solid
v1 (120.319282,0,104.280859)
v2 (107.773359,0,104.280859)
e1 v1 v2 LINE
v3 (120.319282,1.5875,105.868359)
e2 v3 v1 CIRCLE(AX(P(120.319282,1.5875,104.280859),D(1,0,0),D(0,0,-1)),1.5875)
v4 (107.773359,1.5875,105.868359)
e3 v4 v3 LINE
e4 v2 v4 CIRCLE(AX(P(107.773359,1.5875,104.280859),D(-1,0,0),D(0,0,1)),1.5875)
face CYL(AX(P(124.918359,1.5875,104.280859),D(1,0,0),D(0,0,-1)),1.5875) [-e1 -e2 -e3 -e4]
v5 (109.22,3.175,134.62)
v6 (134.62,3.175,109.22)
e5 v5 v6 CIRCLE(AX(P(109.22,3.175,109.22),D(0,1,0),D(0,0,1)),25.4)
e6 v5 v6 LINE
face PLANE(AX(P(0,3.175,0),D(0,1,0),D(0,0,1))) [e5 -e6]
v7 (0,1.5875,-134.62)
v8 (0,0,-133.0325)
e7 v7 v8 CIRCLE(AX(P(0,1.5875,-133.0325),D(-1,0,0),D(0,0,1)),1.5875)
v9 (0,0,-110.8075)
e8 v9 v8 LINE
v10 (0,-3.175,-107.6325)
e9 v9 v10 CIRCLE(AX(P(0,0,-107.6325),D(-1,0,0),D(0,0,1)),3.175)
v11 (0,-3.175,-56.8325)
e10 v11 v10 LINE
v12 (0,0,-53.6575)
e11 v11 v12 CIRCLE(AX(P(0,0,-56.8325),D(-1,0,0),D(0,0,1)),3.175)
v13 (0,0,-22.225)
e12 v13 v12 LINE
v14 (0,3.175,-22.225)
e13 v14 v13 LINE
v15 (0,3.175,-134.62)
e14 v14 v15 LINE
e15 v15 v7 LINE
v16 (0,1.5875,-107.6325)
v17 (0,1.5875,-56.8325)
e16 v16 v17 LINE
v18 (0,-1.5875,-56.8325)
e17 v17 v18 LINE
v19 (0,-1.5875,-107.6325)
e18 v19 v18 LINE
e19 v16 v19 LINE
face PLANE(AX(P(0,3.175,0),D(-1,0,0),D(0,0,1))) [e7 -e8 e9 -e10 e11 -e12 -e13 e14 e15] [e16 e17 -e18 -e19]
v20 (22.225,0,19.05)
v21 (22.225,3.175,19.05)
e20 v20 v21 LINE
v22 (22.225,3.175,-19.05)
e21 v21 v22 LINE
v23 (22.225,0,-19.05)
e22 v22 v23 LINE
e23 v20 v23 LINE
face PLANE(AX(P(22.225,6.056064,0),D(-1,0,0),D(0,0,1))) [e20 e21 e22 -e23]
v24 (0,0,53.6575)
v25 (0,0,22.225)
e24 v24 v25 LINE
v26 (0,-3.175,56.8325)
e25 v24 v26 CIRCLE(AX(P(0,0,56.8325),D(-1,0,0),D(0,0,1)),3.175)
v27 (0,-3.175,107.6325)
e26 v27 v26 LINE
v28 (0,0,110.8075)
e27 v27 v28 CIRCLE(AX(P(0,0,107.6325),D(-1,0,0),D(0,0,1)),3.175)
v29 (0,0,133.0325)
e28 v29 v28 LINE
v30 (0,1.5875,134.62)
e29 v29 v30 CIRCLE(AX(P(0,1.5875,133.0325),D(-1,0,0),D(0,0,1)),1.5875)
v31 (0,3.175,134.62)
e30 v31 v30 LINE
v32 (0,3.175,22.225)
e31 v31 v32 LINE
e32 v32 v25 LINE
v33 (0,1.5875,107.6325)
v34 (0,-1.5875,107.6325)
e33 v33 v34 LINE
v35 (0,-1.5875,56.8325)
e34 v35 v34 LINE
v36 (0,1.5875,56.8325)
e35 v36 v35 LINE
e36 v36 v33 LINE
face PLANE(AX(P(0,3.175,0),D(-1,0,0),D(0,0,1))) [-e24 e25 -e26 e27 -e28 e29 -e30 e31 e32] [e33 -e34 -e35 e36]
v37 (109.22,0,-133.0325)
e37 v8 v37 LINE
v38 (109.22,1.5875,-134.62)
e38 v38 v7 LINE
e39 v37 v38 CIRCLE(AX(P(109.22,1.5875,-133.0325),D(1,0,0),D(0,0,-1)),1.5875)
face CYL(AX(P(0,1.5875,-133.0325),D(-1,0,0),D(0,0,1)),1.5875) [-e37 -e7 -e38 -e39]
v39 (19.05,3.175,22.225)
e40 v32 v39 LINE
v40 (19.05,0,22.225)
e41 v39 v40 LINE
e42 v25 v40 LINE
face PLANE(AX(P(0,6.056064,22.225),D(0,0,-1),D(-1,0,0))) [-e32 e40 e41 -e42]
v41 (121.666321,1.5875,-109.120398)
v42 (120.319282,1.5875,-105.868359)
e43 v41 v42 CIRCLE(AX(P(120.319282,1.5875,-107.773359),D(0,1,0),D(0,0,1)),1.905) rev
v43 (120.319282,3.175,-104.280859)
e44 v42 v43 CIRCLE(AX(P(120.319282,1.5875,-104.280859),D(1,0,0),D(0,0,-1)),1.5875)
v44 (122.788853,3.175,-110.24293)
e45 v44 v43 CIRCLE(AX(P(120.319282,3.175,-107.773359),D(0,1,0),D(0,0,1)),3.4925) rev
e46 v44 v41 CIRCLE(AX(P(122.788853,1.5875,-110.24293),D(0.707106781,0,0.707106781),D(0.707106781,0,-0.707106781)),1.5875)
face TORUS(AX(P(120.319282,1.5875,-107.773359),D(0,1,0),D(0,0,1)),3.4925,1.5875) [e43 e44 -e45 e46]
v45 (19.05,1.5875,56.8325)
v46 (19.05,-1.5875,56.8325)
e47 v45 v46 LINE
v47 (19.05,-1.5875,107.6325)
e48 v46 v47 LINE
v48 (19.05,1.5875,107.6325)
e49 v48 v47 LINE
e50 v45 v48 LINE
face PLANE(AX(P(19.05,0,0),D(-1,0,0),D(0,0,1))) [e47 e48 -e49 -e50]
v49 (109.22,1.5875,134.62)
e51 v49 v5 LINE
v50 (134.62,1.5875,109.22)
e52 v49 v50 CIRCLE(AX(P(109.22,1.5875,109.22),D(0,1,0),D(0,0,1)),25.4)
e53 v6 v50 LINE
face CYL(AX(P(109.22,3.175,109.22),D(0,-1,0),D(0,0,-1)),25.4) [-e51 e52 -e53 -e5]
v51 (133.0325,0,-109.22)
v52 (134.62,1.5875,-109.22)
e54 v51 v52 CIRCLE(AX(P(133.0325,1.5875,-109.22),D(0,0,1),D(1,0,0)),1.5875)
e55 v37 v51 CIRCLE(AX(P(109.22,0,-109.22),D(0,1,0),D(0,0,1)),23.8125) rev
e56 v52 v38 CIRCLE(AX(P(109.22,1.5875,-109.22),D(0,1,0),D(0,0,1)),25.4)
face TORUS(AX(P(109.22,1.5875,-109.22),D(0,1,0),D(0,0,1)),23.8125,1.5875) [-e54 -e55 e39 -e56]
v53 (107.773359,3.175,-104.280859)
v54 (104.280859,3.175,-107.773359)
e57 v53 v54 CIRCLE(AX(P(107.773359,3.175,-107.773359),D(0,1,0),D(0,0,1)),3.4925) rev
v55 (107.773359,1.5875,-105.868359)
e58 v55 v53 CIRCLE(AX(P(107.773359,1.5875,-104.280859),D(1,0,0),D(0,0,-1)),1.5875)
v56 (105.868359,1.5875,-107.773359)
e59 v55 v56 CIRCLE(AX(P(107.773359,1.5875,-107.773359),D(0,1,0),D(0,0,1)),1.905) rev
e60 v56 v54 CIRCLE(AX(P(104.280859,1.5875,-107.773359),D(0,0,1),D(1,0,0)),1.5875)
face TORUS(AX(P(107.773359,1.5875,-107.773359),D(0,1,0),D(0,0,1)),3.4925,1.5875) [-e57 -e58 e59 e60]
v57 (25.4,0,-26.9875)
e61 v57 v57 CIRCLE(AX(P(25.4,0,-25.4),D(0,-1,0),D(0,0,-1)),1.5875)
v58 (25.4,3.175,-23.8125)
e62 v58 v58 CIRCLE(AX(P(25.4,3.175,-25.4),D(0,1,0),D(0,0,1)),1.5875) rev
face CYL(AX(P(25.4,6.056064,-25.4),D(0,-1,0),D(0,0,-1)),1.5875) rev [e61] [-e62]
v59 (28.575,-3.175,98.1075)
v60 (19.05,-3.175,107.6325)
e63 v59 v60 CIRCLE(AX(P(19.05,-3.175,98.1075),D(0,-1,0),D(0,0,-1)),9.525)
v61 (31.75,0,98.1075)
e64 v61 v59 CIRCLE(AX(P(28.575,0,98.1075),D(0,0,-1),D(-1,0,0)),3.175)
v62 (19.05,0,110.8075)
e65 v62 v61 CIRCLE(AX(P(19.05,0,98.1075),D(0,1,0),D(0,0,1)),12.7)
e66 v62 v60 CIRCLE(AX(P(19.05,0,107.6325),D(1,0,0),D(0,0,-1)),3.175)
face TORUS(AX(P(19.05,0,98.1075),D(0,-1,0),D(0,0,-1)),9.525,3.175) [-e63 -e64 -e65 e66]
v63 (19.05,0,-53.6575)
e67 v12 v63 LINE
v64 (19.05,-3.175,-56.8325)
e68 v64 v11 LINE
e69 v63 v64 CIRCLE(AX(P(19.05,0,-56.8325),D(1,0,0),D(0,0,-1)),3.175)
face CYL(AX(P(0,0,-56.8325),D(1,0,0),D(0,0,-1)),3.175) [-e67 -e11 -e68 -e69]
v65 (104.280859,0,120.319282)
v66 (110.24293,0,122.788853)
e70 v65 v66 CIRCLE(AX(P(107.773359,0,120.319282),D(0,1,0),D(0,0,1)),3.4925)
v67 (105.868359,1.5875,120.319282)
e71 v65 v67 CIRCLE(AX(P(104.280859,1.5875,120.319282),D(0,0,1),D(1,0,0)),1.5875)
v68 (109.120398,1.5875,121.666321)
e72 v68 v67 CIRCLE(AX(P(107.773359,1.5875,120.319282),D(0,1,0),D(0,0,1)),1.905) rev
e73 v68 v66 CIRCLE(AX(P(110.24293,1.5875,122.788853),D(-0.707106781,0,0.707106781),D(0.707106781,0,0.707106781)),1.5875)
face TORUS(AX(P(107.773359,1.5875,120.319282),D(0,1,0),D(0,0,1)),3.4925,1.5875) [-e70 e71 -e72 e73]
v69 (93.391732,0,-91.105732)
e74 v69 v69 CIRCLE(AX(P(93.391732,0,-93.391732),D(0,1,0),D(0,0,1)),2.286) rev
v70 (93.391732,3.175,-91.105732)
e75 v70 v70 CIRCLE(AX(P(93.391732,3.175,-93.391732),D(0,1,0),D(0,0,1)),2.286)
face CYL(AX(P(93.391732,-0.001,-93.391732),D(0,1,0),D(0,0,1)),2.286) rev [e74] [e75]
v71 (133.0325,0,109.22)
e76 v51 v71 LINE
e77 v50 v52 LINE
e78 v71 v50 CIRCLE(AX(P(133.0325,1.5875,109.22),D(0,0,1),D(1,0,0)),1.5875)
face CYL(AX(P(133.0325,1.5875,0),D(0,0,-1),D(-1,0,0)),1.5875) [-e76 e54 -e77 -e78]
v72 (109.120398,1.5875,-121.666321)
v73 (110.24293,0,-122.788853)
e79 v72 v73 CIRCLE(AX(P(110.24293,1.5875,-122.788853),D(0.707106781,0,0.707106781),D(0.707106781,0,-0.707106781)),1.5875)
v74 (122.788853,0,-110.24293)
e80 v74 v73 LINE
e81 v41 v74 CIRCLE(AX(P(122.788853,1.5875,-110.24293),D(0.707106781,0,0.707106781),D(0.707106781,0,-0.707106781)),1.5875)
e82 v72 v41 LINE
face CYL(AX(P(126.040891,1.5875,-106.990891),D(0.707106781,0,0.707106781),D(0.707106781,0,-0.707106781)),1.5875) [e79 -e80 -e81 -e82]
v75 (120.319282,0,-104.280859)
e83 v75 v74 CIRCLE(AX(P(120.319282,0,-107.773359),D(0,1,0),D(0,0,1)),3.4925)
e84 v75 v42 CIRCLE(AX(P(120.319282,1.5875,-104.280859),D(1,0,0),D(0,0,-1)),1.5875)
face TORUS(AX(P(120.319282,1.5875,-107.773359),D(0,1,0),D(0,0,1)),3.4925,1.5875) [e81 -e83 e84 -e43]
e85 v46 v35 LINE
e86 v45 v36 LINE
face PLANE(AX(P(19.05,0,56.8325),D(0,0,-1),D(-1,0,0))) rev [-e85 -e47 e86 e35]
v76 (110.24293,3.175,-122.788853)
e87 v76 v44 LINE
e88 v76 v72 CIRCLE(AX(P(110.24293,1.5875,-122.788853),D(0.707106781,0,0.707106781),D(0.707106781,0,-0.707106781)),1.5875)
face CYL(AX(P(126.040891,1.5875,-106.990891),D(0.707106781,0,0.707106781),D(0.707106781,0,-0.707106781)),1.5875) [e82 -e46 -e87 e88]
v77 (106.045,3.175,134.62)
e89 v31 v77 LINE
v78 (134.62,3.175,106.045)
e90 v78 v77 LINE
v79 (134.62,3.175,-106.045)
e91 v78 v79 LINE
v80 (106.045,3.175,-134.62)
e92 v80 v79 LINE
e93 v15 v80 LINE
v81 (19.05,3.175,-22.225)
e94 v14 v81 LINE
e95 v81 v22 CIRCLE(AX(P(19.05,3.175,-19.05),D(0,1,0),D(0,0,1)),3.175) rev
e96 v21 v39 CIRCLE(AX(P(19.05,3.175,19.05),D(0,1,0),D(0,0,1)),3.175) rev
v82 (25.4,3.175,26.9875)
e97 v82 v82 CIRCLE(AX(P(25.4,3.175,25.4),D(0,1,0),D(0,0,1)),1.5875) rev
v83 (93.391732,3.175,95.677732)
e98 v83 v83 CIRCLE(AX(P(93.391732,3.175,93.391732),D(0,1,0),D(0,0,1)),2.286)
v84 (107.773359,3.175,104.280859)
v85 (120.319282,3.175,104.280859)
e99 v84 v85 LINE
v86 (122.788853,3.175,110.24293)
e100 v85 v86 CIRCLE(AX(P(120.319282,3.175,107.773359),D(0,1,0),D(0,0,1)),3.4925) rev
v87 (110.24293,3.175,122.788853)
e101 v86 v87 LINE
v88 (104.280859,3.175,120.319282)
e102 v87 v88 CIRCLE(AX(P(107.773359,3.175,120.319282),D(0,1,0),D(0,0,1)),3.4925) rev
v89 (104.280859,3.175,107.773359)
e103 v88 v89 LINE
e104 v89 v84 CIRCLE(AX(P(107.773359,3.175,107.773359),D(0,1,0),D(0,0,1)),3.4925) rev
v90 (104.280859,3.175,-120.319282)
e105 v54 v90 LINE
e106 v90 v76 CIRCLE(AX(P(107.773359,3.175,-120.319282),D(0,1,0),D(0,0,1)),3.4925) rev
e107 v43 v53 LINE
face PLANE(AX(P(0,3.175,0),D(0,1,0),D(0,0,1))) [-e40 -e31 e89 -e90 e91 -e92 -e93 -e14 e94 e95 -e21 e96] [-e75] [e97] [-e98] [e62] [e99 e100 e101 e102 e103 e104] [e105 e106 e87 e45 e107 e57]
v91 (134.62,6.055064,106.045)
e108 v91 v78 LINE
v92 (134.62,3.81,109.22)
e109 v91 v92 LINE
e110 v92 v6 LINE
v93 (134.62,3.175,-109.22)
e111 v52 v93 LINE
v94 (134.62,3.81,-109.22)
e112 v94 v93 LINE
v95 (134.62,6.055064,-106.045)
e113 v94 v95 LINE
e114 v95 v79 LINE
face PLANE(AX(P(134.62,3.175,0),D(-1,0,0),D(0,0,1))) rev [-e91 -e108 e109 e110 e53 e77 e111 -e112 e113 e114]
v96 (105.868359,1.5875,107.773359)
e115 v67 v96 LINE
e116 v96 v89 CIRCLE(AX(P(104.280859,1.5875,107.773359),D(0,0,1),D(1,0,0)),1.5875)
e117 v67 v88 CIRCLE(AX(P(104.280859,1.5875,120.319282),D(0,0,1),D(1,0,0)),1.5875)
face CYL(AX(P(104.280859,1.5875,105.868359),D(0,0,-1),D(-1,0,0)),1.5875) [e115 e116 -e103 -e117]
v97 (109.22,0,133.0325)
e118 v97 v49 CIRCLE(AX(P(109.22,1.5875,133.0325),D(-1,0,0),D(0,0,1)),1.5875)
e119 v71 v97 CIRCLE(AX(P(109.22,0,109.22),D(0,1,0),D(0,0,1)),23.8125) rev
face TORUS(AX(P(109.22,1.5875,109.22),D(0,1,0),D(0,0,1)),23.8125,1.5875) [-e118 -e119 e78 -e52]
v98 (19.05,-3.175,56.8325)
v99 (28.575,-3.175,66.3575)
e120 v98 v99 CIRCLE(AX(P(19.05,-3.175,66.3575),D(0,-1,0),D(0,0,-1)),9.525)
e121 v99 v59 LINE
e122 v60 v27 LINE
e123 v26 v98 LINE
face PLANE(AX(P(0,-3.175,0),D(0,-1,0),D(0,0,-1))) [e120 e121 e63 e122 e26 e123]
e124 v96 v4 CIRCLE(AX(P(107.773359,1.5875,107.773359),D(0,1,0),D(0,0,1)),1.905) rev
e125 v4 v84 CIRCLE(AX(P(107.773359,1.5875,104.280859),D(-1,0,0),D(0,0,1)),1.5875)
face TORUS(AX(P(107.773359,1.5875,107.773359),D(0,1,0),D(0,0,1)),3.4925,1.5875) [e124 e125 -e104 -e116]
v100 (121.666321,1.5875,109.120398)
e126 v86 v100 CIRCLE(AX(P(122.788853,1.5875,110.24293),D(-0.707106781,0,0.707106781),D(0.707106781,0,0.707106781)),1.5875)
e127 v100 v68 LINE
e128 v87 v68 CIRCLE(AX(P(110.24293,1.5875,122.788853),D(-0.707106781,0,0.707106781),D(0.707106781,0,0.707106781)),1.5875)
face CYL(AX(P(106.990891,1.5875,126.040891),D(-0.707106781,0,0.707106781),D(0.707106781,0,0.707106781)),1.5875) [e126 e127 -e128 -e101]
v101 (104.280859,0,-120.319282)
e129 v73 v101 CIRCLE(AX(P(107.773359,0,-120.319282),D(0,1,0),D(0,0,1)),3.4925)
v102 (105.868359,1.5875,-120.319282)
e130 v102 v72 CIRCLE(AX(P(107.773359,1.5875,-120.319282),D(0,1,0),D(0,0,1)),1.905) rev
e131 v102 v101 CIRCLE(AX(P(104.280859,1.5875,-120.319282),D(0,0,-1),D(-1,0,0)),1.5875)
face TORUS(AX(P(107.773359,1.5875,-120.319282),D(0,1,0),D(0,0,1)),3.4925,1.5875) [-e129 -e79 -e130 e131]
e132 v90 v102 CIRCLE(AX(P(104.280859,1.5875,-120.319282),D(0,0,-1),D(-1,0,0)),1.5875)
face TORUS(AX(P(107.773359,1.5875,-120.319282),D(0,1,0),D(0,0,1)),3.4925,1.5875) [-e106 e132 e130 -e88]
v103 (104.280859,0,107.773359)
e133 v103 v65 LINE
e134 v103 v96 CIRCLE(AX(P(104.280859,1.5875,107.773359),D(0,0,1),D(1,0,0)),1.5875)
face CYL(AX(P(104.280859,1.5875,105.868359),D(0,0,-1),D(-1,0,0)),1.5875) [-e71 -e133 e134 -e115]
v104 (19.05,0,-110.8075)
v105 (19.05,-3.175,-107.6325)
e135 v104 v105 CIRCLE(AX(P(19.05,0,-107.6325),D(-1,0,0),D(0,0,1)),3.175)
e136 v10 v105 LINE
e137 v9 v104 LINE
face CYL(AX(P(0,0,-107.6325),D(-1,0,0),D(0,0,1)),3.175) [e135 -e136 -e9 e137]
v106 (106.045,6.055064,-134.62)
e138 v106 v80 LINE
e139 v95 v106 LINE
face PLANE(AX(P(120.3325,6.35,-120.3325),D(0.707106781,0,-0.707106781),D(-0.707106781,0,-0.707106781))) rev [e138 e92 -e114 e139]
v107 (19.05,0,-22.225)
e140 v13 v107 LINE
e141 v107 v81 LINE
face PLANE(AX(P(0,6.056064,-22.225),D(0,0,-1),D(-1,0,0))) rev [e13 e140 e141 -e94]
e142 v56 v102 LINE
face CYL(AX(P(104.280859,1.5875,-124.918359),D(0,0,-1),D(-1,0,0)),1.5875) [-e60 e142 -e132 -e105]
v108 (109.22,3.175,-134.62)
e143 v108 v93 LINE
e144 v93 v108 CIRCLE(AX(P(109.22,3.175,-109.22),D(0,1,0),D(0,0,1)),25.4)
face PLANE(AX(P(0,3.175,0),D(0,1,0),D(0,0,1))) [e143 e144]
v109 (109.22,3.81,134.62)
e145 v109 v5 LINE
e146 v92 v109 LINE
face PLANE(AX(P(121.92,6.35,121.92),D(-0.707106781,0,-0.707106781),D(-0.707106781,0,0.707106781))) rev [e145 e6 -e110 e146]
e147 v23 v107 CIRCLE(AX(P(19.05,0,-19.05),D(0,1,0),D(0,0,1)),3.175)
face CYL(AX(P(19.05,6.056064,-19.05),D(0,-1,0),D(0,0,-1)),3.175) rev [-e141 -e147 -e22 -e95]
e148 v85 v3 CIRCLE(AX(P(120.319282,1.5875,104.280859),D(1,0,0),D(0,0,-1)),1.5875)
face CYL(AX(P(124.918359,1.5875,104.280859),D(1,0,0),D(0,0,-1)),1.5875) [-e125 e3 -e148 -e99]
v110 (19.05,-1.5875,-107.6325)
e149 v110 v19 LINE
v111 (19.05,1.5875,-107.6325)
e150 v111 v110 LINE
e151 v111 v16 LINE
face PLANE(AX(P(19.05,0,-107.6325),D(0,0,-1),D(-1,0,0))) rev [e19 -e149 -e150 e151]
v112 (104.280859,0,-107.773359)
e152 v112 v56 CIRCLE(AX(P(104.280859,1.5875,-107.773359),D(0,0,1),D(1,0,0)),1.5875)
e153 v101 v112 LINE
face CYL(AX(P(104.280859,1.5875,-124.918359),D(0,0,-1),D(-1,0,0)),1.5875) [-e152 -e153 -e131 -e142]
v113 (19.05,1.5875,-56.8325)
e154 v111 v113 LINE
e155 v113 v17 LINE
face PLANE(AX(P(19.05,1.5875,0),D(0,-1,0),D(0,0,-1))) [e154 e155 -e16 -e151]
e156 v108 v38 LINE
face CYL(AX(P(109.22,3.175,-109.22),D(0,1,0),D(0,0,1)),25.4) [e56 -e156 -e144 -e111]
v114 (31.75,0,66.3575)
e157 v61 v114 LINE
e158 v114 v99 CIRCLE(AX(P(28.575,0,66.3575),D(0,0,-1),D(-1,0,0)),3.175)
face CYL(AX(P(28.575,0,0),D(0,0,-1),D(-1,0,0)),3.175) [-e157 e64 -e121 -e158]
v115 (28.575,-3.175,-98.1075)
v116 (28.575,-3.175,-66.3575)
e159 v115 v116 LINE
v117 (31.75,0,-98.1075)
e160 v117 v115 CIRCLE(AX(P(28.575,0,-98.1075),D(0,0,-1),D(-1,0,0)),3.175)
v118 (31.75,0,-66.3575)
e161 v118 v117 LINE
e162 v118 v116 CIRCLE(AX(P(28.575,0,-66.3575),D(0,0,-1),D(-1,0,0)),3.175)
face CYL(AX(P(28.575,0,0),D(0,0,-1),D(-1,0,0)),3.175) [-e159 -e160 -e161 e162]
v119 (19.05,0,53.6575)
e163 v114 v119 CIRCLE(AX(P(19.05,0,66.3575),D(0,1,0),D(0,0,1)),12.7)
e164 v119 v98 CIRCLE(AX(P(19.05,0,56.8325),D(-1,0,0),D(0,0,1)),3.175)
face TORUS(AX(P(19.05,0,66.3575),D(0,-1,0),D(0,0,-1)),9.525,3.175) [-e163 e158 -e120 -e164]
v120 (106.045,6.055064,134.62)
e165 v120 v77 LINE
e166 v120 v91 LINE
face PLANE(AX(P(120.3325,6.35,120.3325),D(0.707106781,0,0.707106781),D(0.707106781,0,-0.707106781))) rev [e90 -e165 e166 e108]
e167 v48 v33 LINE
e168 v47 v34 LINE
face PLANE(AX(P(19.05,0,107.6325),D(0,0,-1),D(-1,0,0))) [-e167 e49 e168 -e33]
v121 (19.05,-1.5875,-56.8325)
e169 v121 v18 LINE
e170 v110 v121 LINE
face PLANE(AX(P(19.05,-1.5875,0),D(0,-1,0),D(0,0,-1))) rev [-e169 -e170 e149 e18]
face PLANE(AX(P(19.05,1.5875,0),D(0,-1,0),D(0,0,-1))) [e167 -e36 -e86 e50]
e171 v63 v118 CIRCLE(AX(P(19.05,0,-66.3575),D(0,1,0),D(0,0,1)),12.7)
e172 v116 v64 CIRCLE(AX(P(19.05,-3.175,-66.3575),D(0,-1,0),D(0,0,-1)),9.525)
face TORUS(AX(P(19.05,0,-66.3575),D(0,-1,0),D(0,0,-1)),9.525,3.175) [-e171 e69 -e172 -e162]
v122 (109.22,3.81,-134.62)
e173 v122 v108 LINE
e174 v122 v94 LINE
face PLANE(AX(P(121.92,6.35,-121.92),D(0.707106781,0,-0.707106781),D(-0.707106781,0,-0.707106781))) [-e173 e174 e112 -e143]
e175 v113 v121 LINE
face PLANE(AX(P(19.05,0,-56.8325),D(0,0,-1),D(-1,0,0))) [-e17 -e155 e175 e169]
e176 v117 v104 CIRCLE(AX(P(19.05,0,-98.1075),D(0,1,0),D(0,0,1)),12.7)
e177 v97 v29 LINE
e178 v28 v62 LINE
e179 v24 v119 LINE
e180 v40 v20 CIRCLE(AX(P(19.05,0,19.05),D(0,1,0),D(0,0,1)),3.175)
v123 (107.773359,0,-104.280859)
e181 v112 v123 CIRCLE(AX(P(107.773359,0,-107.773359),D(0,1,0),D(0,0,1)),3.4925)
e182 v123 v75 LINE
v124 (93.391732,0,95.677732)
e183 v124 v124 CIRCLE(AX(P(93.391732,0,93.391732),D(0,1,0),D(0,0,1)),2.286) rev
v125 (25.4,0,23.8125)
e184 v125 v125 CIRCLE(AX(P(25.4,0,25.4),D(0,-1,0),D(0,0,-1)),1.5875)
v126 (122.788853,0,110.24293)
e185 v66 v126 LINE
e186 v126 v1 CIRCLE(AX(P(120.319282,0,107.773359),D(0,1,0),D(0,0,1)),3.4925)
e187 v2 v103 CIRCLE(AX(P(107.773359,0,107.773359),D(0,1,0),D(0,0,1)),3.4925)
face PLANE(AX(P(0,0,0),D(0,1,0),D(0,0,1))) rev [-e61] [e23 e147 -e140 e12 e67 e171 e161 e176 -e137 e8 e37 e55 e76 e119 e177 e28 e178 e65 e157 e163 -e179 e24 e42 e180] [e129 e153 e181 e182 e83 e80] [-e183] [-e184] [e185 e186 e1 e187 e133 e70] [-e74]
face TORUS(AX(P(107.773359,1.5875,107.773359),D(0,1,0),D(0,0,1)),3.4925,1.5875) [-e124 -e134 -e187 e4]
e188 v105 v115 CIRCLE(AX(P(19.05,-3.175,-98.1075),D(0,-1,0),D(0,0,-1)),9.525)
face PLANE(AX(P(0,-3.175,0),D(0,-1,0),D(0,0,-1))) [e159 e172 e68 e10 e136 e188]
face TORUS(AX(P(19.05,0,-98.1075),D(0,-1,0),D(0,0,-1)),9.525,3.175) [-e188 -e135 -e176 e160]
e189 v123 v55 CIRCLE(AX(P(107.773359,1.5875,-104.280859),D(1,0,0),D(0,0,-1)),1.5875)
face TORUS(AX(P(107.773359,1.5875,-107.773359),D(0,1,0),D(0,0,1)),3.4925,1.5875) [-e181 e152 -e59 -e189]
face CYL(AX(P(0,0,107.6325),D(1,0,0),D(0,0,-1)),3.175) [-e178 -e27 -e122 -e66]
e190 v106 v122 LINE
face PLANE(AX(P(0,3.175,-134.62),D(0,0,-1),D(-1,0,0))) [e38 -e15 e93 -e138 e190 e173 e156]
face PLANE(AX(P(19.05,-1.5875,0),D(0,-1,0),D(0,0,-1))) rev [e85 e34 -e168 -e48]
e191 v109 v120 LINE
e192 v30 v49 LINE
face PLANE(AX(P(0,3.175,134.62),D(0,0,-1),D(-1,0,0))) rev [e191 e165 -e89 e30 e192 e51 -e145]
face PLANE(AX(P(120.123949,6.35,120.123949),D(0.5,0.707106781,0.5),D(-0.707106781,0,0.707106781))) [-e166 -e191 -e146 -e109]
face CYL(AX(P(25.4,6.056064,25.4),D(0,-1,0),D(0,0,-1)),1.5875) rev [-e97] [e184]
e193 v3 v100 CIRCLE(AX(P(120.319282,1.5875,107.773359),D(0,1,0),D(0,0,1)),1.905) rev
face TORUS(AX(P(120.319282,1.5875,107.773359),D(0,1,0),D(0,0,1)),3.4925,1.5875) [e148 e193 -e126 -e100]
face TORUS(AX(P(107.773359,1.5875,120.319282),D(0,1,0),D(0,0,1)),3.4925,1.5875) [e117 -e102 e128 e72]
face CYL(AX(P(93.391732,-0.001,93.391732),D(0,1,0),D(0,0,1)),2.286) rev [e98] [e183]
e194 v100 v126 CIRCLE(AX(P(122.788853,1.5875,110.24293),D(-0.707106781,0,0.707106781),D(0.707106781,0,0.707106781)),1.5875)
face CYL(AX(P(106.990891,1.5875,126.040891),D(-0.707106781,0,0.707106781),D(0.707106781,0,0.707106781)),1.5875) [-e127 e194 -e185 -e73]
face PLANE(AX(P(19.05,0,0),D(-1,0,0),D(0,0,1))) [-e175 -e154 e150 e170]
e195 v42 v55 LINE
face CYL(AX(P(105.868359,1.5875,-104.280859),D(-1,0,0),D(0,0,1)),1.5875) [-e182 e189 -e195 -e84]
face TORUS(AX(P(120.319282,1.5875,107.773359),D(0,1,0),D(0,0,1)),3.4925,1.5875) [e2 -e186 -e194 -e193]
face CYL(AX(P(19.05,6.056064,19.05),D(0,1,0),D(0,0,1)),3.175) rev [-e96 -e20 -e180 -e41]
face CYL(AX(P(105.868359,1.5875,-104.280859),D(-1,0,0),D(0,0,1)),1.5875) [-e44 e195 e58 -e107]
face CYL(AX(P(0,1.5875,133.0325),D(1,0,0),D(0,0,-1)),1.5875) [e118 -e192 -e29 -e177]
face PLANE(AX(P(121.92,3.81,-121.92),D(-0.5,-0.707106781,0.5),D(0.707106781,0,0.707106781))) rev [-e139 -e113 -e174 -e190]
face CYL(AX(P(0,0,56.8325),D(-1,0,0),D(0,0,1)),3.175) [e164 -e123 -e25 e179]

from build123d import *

# Parameters (mm, degrees)
SKETCH1_W           = 134.62
SKETCH1_H           = 269.24
BOSS_EXTRUDE1_DEPTH = 3.175
BOSS_EXTRUDE2_DEPTH = 3.175
CUT_EXTRUDE1_REACH  = 192.408
SKETCH2_3_R         = 2.286
CHAMFER1_SIZE       = 2.54
FILLET1_R           = 1.905
FILLET2_R           = 1.5875
FILLET3_R           = 25.4
FILLET4_R           = 1.5875
SKETCH3_W           = 31.75
SKETCH3_H           = 57.15
BOSS_EXTRUDE3_DEPTH = 3.175
SKETCH4_W           = 50.8
SKETCH4_H           = 3.175
CUT_EXTRUDE2_DEPTH  = 19.05
FILLET5_R           = 12.7
FILLET6_R           = 3.175
CUT_EXTRUDE3_REACH  = 192.478
SKETCH5_W           = 22.225
SKETCH5_H           = 44.45
SKETCH5_R           = 1.5875
FILLET7_R           = 3.175


# Some blends are built 0.0001 mm under size
with BuildPart() as part:
    # Sketch1 → Boss-Extrude1 (new body)
    with BuildSketch(Plane(origin=(0, 0, 0), x_dir=(1, 0, 0), z_dir=(0, 1, 0))):
        with Locations((67.31, 0)):
            Rectangle(SKETCH1_W, SKETCH1_H)
    extrude(amount=BOSS_EXTRUDE1_DEPTH)

    # Sketch2 → Boss-Extrude2 (add)
    with BuildSketch(Plane(origin=(0, 3.175, 0), x_dir=(1, 0, 0), z_dir=(0, 1, 0))):
        Polygon((134.62, 109.22), (109.22, 134.62), (106.045, 134.62), (120.3325, 120.3325), (134.62, 106.045), align=None)
        Polygon((134.62, -109.22), (134.62, -106.045), (120.3325, -120.3325), (106.045, -134.62), (109.22, -134.62), align=None)
    extrude(amount=BOSS_EXTRUDE2_DEPTH)

    # Sketch2<3> → Cut-Extrude1 (cut, up to next)
    with BuildSketch(Plane(origin=(0, 3.175, 0), x_dir=(1, 0, 0), z_dir=(0, 1, 0)), mode=Mode.PRIVATE) as cut_extrude1_sk1:
        with Locations(Location((93.391731637, -93.391731637, 0), (0, 0, 270))):
            Circle(SKETCH2_3_R)
    cut_extrude1_tool1 = extrude(cut_extrude1_sk1.sketch, amount=-CUT_EXTRUDE1_REACH, mode=Mode.PRIVATE) & part.part
    # Sketch2<3> → Cut-Extrude1 (cut, up to next)
    with BuildSketch(Plane(origin=(0, 3.175, 0), x_dir=(1, 0, 0), z_dir=(0, 1, 0)), mode=Mode.PRIVATE) as cut_extrude1_sk2:
        with Locations(Location((93.391731637, 93.391731637, 0), (0, 0, 270))):
            Circle(SKETCH2_3_R)
    cut_extrude1_tool2 = extrude(cut_extrude1_sk2.sketch, amount=-CUT_EXTRUDE1_REACH, mode=Mode.PRIVATE) & part.part
    # Sketch2<3> → Cut-Extrude1 (cut, up to next)
    with BuildSketch(Plane(origin=(0, 3.175, 0), x_dir=(1, 0, 0), z_dir=(0, 1, 0)), mode=Mode.PRIVATE) as cut_extrude1_sk3:
        Polygon((105.868359133, -124.918359133), (124.918359133, -105.868359133), (105.868359133, -105.868359133), align=None)
    cut_extrude1_tool3 = extrude(cut_extrude1_sk3.sketch, amount=-CUT_EXTRUDE1_REACH, mode=Mode.PRIVATE) & part.part
    # Sketch2<3> → Cut-Extrude1 (cut, up to next)
    with BuildSketch(Plane(origin=(0, 3.175, 0), x_dir=(1, 0, 0), z_dir=(0, 1, 0)), mode=Mode.PRIVATE) as cut_extrude1_sk4:
        Polygon((124.918359133, 105.868359133), (105.868359133, 124.918359133), (105.868359133, 105.868359133), align=None)
    cut_extrude1_tool4 = extrude(cut_extrude1_sk4.sketch, amount=-CUT_EXTRUDE1_REACH, mode=Mode.PRIVATE) & part.part
    add(cut_extrude1_tool1.solids().sort_by_distance((93.391732, 3.175, 93.391732))[0], mode=Mode.SUBTRACT)
    add(cut_extrude1_tool2.solids().sort_by_distance((93.391732, 3.175, -93.391732))[0], mode=Mode.SUBTRACT)
    add(cut_extrude1_tool3.solids().sort_by_distance((112.218359, 3.175, 112.218359))[0], mode=Mode.SUBTRACT)
    add(cut_extrude1_tool4.solids().sort_by_distance((112.218359, 3.175, -112.218359))[0], mode=Mode.SUBTRACT)

    # Chamfer1
    # the kernel refuses this chamfer: 2.54 mm, written as the material it takes off along each edge
    with BuildSketch(Plane(origin=(104.601125621, 6.35, 139.238874379), x_dir=(0.019442520806015235, -0.9996219169112966, 0.019442520806015006), z_dir=(0.7071067811865434, 0, -0.7071067811865517)), Plane(origin=(139.238874379, 6.35, -104.601125621), x_dir=(0.019442520806015124, -0.9996219169112966, -0.019442520806015124), z_dir=(-0.7071067811865476, 0, -0.7071067811865476))) as chamfer1_piece_1:
        Polygon((CHAMFER1_SIZE * 0.999621916911, CHAMFER1_SIZE * 0.0274958766106), (-CHAMFER1_SIZE * 0.0274958766106, CHAMFER1_SIZE * 0.999621916911), (0, 0), align=None)
    extrude(amount=48.985174063, mode=Mode.SUBTRACT)

    # Fillet1
    fillet1_edges = [part.edges().sort_by_distance(p)[0] for p in [
        (105.868359133, 1.5875, -124.918359133),
        (124.918359133, 1.5875, -105.868359133),
        (105.868359133, 1.5875, -105.868359133),
        (105.868359133, 1.5875, 105.868359133),
        (124.918359133, 1.5875, 105.868359133),
        (105.868359133, 1.5875, 124.918359133),
    ]]
    fillet(fillet1_edges, radius=FILLET1_R)

    # Fillet2
    fillet2_edges = [part.edges().sort_by_distance(p)[0] for p in [
        (107.044347195, 3.175, 122.079272807),
        (105.868359133, 3.175, 114.046320715),
        (106.426320715, 3.175, 106.426320715),
        (114.046320715, 3.175, 105.868359133),
        (122.079272807, 3.175, 107.044347195),
        (122.079272807, 0, 107.044347195),
        (114.046320715, 0, 105.868359133),
        (106.426320715, 0, 106.426320715),
        (105.868359133, 0, 114.046320715),
        (107.044347195, 0, 122.079272807),
        (122.079272807, 3.175, -107.044347195),
        (114.046320715, 3.175, -105.868359133),
        (106.426320715, 3.175, -106.426320715),
        (105.868359133, 3.175, -114.046320715),
        (107.044347195, 3.175, -122.079272807),
        (107.044347195, 0, -122.079272807),
        (105.868359133, 0, -114.046320715),
        (106.426320715, 0, -106.426320715),
        (114.046320715, 0, -105.868359133),
        (122.079272807, 0, -107.044347195),
        (115.393359133, 3.175, 115.393359133),
        (115.393359133, 0, 115.393359133),
        (115.393359133, 3.175, -115.393359133),
        (115.393359133, 0, -115.393359133),
    ]]
    fillet(fillet2_edges, radius=FILLET2_R - 0.0001)  # a hair under: the kernel refuses the full size

    # Fillet3
    fillet3_edges = [part.edges().sort_by_distance(p)[0] for p in [
        (134.62, 1.5875, -134.62),
        (134.62, 1.5875, 134.62),
    ]]
    fillet(fillet3_edges, radius=FILLET3_R)

    # Fillet4
    fillet4_edges = [part.edges().sort_by_distance(p)[0] for p in [
        (134.62, 0, 0),
        (127.180512242, 0, 127.180512242),
        (127.180512242, 0, -127.180512242),
        (54.61, 0, -134.62),
        (54.61, 0, 134.62),
    ]]
    fillet(fillet4_edges, radius=FILLET4_R)

    # Sketch3 → Boss-Extrude3 (add)
    with BuildSketch(Plane.XZ):
        with Locations((15.875, 82.2325)):
            Rectangle(SKETCH3_W, SKETCH3_H)
        with Locations((15.875, -82.2325)):
            Rectangle(SKETCH3_W, SKETCH3_H)
    extrude(amount=BOSS_EXTRUDE3_DEPTH)

    # Sketch4 → Cut-Extrude2 (cut)
    with BuildSketch(Plane.ZY):
        with Locations((82.2325, 0)):
            Rectangle(SKETCH4_W, SKETCH4_H)
        with Locations((-82.2325, 0)):
            Rectangle(SKETCH4_W, SKETCH4_H)
    extrude(amount=-CUT_EXTRUDE2_DEPTH, mode=Mode.SUBTRACT)

    # Fillet5
    fillet5_edges = [part.edges().sort_by_distance(p)[0] for p in [
        (31.75, -1.5875, 53.6575),
        (31.75, -1.5875, 110.8075),
        (31.75, -1.5875, -110.8075),
        (31.75, -1.5875, -53.6575),
    ]]
    fillet(fillet5_edges, radius=FILLET5_R)

    # Fillet6
    fillet6_edges = [part.edges().sort_by_distance(p)[0] for p in [
        (9.525, -3.175, -110.8075),
        (28.030256121, -3.175, -107.087756121),
        (31.75, -3.175, -82.2325),
        (28.030256121, -3.175, -57.377243879),
        (9.525, -3.175, 53.6575),
        (28.030256121, -3.175, 57.377243879),
        (31.75, -3.175, 82.2325),
        (28.030256121, -3.175, 107.087756121),
        (9.525, -3.175, -53.6575),
        (9.525, -3.175, 110.8075),
    ]]
    fillet(fillet6_edges, radius=FILLET6_R - 0.0001)  # a hair under: the kernel refuses the full size

    # Sketch5 → Cut-Extrude3 (cut, up to next)
    with BuildSketch(Plane.XZ, mode=Mode.PRIVATE) as cut_extrude3_sk1:
        with Locations((11.1125, 0)):
            Rectangle(SKETCH5_W, SKETCH5_H)
    cut_extrude3_tool1 = extrude(cut_extrude3_sk1.sketch, amount=-CUT_EXTRUDE3_REACH, mode=Mode.PRIVATE) & part.part
    # Sketch5 → Cut-Extrude3 (cut, up to next)
    with BuildSketch(Plane.XZ, mode=Mode.PRIVATE) as cut_extrude3_sk2:
        with Locations(Location((25.4, 25.4, 0), (0, 0, 270))):
            Circle(SKETCH5_R)
    cut_extrude3_tool2 = extrude(cut_extrude3_sk2.sketch, amount=-CUT_EXTRUDE3_REACH, mode=Mode.PRIVATE) & part.part
    # Sketch5 → Cut-Extrude3 (cut, up to next)
    with BuildSketch(Plane.XZ, mode=Mode.PRIVATE) as cut_extrude3_sk3:
        with Locations(Location((25.4, -25.4, 0), (0, 0, 270))):
            Circle(SKETCH5_R)
    cut_extrude3_tool3 = extrude(cut_extrude3_sk3.sketch, amount=-CUT_EXTRUDE3_REACH, mode=Mode.PRIVATE) & part.part
    add(cut_extrude3_tool1.solids().sort_by_distance((11.1125, 0, 0))[0], mode=Mode.SUBTRACT)
    add(cut_extrude3_tool2.solids().sort_by_distance((25.4, 0, 25.4))[0], mode=Mode.SUBTRACT)
    add(cut_extrude3_tool3.solids().sort_by_distance((25.4, 0, -25.4))[0], mode=Mode.SUBTRACT)

    # Fillet7
    fillet7_edges = [part.edges().sort_by_distance(p)[0] for p in [
        (22.225, 1.5875, 22.225),
        (22.225, 1.5875, -22.225),
    ]]
    fillet(fillet7_edges, radius=FILLET7_R)


solid = part.part
